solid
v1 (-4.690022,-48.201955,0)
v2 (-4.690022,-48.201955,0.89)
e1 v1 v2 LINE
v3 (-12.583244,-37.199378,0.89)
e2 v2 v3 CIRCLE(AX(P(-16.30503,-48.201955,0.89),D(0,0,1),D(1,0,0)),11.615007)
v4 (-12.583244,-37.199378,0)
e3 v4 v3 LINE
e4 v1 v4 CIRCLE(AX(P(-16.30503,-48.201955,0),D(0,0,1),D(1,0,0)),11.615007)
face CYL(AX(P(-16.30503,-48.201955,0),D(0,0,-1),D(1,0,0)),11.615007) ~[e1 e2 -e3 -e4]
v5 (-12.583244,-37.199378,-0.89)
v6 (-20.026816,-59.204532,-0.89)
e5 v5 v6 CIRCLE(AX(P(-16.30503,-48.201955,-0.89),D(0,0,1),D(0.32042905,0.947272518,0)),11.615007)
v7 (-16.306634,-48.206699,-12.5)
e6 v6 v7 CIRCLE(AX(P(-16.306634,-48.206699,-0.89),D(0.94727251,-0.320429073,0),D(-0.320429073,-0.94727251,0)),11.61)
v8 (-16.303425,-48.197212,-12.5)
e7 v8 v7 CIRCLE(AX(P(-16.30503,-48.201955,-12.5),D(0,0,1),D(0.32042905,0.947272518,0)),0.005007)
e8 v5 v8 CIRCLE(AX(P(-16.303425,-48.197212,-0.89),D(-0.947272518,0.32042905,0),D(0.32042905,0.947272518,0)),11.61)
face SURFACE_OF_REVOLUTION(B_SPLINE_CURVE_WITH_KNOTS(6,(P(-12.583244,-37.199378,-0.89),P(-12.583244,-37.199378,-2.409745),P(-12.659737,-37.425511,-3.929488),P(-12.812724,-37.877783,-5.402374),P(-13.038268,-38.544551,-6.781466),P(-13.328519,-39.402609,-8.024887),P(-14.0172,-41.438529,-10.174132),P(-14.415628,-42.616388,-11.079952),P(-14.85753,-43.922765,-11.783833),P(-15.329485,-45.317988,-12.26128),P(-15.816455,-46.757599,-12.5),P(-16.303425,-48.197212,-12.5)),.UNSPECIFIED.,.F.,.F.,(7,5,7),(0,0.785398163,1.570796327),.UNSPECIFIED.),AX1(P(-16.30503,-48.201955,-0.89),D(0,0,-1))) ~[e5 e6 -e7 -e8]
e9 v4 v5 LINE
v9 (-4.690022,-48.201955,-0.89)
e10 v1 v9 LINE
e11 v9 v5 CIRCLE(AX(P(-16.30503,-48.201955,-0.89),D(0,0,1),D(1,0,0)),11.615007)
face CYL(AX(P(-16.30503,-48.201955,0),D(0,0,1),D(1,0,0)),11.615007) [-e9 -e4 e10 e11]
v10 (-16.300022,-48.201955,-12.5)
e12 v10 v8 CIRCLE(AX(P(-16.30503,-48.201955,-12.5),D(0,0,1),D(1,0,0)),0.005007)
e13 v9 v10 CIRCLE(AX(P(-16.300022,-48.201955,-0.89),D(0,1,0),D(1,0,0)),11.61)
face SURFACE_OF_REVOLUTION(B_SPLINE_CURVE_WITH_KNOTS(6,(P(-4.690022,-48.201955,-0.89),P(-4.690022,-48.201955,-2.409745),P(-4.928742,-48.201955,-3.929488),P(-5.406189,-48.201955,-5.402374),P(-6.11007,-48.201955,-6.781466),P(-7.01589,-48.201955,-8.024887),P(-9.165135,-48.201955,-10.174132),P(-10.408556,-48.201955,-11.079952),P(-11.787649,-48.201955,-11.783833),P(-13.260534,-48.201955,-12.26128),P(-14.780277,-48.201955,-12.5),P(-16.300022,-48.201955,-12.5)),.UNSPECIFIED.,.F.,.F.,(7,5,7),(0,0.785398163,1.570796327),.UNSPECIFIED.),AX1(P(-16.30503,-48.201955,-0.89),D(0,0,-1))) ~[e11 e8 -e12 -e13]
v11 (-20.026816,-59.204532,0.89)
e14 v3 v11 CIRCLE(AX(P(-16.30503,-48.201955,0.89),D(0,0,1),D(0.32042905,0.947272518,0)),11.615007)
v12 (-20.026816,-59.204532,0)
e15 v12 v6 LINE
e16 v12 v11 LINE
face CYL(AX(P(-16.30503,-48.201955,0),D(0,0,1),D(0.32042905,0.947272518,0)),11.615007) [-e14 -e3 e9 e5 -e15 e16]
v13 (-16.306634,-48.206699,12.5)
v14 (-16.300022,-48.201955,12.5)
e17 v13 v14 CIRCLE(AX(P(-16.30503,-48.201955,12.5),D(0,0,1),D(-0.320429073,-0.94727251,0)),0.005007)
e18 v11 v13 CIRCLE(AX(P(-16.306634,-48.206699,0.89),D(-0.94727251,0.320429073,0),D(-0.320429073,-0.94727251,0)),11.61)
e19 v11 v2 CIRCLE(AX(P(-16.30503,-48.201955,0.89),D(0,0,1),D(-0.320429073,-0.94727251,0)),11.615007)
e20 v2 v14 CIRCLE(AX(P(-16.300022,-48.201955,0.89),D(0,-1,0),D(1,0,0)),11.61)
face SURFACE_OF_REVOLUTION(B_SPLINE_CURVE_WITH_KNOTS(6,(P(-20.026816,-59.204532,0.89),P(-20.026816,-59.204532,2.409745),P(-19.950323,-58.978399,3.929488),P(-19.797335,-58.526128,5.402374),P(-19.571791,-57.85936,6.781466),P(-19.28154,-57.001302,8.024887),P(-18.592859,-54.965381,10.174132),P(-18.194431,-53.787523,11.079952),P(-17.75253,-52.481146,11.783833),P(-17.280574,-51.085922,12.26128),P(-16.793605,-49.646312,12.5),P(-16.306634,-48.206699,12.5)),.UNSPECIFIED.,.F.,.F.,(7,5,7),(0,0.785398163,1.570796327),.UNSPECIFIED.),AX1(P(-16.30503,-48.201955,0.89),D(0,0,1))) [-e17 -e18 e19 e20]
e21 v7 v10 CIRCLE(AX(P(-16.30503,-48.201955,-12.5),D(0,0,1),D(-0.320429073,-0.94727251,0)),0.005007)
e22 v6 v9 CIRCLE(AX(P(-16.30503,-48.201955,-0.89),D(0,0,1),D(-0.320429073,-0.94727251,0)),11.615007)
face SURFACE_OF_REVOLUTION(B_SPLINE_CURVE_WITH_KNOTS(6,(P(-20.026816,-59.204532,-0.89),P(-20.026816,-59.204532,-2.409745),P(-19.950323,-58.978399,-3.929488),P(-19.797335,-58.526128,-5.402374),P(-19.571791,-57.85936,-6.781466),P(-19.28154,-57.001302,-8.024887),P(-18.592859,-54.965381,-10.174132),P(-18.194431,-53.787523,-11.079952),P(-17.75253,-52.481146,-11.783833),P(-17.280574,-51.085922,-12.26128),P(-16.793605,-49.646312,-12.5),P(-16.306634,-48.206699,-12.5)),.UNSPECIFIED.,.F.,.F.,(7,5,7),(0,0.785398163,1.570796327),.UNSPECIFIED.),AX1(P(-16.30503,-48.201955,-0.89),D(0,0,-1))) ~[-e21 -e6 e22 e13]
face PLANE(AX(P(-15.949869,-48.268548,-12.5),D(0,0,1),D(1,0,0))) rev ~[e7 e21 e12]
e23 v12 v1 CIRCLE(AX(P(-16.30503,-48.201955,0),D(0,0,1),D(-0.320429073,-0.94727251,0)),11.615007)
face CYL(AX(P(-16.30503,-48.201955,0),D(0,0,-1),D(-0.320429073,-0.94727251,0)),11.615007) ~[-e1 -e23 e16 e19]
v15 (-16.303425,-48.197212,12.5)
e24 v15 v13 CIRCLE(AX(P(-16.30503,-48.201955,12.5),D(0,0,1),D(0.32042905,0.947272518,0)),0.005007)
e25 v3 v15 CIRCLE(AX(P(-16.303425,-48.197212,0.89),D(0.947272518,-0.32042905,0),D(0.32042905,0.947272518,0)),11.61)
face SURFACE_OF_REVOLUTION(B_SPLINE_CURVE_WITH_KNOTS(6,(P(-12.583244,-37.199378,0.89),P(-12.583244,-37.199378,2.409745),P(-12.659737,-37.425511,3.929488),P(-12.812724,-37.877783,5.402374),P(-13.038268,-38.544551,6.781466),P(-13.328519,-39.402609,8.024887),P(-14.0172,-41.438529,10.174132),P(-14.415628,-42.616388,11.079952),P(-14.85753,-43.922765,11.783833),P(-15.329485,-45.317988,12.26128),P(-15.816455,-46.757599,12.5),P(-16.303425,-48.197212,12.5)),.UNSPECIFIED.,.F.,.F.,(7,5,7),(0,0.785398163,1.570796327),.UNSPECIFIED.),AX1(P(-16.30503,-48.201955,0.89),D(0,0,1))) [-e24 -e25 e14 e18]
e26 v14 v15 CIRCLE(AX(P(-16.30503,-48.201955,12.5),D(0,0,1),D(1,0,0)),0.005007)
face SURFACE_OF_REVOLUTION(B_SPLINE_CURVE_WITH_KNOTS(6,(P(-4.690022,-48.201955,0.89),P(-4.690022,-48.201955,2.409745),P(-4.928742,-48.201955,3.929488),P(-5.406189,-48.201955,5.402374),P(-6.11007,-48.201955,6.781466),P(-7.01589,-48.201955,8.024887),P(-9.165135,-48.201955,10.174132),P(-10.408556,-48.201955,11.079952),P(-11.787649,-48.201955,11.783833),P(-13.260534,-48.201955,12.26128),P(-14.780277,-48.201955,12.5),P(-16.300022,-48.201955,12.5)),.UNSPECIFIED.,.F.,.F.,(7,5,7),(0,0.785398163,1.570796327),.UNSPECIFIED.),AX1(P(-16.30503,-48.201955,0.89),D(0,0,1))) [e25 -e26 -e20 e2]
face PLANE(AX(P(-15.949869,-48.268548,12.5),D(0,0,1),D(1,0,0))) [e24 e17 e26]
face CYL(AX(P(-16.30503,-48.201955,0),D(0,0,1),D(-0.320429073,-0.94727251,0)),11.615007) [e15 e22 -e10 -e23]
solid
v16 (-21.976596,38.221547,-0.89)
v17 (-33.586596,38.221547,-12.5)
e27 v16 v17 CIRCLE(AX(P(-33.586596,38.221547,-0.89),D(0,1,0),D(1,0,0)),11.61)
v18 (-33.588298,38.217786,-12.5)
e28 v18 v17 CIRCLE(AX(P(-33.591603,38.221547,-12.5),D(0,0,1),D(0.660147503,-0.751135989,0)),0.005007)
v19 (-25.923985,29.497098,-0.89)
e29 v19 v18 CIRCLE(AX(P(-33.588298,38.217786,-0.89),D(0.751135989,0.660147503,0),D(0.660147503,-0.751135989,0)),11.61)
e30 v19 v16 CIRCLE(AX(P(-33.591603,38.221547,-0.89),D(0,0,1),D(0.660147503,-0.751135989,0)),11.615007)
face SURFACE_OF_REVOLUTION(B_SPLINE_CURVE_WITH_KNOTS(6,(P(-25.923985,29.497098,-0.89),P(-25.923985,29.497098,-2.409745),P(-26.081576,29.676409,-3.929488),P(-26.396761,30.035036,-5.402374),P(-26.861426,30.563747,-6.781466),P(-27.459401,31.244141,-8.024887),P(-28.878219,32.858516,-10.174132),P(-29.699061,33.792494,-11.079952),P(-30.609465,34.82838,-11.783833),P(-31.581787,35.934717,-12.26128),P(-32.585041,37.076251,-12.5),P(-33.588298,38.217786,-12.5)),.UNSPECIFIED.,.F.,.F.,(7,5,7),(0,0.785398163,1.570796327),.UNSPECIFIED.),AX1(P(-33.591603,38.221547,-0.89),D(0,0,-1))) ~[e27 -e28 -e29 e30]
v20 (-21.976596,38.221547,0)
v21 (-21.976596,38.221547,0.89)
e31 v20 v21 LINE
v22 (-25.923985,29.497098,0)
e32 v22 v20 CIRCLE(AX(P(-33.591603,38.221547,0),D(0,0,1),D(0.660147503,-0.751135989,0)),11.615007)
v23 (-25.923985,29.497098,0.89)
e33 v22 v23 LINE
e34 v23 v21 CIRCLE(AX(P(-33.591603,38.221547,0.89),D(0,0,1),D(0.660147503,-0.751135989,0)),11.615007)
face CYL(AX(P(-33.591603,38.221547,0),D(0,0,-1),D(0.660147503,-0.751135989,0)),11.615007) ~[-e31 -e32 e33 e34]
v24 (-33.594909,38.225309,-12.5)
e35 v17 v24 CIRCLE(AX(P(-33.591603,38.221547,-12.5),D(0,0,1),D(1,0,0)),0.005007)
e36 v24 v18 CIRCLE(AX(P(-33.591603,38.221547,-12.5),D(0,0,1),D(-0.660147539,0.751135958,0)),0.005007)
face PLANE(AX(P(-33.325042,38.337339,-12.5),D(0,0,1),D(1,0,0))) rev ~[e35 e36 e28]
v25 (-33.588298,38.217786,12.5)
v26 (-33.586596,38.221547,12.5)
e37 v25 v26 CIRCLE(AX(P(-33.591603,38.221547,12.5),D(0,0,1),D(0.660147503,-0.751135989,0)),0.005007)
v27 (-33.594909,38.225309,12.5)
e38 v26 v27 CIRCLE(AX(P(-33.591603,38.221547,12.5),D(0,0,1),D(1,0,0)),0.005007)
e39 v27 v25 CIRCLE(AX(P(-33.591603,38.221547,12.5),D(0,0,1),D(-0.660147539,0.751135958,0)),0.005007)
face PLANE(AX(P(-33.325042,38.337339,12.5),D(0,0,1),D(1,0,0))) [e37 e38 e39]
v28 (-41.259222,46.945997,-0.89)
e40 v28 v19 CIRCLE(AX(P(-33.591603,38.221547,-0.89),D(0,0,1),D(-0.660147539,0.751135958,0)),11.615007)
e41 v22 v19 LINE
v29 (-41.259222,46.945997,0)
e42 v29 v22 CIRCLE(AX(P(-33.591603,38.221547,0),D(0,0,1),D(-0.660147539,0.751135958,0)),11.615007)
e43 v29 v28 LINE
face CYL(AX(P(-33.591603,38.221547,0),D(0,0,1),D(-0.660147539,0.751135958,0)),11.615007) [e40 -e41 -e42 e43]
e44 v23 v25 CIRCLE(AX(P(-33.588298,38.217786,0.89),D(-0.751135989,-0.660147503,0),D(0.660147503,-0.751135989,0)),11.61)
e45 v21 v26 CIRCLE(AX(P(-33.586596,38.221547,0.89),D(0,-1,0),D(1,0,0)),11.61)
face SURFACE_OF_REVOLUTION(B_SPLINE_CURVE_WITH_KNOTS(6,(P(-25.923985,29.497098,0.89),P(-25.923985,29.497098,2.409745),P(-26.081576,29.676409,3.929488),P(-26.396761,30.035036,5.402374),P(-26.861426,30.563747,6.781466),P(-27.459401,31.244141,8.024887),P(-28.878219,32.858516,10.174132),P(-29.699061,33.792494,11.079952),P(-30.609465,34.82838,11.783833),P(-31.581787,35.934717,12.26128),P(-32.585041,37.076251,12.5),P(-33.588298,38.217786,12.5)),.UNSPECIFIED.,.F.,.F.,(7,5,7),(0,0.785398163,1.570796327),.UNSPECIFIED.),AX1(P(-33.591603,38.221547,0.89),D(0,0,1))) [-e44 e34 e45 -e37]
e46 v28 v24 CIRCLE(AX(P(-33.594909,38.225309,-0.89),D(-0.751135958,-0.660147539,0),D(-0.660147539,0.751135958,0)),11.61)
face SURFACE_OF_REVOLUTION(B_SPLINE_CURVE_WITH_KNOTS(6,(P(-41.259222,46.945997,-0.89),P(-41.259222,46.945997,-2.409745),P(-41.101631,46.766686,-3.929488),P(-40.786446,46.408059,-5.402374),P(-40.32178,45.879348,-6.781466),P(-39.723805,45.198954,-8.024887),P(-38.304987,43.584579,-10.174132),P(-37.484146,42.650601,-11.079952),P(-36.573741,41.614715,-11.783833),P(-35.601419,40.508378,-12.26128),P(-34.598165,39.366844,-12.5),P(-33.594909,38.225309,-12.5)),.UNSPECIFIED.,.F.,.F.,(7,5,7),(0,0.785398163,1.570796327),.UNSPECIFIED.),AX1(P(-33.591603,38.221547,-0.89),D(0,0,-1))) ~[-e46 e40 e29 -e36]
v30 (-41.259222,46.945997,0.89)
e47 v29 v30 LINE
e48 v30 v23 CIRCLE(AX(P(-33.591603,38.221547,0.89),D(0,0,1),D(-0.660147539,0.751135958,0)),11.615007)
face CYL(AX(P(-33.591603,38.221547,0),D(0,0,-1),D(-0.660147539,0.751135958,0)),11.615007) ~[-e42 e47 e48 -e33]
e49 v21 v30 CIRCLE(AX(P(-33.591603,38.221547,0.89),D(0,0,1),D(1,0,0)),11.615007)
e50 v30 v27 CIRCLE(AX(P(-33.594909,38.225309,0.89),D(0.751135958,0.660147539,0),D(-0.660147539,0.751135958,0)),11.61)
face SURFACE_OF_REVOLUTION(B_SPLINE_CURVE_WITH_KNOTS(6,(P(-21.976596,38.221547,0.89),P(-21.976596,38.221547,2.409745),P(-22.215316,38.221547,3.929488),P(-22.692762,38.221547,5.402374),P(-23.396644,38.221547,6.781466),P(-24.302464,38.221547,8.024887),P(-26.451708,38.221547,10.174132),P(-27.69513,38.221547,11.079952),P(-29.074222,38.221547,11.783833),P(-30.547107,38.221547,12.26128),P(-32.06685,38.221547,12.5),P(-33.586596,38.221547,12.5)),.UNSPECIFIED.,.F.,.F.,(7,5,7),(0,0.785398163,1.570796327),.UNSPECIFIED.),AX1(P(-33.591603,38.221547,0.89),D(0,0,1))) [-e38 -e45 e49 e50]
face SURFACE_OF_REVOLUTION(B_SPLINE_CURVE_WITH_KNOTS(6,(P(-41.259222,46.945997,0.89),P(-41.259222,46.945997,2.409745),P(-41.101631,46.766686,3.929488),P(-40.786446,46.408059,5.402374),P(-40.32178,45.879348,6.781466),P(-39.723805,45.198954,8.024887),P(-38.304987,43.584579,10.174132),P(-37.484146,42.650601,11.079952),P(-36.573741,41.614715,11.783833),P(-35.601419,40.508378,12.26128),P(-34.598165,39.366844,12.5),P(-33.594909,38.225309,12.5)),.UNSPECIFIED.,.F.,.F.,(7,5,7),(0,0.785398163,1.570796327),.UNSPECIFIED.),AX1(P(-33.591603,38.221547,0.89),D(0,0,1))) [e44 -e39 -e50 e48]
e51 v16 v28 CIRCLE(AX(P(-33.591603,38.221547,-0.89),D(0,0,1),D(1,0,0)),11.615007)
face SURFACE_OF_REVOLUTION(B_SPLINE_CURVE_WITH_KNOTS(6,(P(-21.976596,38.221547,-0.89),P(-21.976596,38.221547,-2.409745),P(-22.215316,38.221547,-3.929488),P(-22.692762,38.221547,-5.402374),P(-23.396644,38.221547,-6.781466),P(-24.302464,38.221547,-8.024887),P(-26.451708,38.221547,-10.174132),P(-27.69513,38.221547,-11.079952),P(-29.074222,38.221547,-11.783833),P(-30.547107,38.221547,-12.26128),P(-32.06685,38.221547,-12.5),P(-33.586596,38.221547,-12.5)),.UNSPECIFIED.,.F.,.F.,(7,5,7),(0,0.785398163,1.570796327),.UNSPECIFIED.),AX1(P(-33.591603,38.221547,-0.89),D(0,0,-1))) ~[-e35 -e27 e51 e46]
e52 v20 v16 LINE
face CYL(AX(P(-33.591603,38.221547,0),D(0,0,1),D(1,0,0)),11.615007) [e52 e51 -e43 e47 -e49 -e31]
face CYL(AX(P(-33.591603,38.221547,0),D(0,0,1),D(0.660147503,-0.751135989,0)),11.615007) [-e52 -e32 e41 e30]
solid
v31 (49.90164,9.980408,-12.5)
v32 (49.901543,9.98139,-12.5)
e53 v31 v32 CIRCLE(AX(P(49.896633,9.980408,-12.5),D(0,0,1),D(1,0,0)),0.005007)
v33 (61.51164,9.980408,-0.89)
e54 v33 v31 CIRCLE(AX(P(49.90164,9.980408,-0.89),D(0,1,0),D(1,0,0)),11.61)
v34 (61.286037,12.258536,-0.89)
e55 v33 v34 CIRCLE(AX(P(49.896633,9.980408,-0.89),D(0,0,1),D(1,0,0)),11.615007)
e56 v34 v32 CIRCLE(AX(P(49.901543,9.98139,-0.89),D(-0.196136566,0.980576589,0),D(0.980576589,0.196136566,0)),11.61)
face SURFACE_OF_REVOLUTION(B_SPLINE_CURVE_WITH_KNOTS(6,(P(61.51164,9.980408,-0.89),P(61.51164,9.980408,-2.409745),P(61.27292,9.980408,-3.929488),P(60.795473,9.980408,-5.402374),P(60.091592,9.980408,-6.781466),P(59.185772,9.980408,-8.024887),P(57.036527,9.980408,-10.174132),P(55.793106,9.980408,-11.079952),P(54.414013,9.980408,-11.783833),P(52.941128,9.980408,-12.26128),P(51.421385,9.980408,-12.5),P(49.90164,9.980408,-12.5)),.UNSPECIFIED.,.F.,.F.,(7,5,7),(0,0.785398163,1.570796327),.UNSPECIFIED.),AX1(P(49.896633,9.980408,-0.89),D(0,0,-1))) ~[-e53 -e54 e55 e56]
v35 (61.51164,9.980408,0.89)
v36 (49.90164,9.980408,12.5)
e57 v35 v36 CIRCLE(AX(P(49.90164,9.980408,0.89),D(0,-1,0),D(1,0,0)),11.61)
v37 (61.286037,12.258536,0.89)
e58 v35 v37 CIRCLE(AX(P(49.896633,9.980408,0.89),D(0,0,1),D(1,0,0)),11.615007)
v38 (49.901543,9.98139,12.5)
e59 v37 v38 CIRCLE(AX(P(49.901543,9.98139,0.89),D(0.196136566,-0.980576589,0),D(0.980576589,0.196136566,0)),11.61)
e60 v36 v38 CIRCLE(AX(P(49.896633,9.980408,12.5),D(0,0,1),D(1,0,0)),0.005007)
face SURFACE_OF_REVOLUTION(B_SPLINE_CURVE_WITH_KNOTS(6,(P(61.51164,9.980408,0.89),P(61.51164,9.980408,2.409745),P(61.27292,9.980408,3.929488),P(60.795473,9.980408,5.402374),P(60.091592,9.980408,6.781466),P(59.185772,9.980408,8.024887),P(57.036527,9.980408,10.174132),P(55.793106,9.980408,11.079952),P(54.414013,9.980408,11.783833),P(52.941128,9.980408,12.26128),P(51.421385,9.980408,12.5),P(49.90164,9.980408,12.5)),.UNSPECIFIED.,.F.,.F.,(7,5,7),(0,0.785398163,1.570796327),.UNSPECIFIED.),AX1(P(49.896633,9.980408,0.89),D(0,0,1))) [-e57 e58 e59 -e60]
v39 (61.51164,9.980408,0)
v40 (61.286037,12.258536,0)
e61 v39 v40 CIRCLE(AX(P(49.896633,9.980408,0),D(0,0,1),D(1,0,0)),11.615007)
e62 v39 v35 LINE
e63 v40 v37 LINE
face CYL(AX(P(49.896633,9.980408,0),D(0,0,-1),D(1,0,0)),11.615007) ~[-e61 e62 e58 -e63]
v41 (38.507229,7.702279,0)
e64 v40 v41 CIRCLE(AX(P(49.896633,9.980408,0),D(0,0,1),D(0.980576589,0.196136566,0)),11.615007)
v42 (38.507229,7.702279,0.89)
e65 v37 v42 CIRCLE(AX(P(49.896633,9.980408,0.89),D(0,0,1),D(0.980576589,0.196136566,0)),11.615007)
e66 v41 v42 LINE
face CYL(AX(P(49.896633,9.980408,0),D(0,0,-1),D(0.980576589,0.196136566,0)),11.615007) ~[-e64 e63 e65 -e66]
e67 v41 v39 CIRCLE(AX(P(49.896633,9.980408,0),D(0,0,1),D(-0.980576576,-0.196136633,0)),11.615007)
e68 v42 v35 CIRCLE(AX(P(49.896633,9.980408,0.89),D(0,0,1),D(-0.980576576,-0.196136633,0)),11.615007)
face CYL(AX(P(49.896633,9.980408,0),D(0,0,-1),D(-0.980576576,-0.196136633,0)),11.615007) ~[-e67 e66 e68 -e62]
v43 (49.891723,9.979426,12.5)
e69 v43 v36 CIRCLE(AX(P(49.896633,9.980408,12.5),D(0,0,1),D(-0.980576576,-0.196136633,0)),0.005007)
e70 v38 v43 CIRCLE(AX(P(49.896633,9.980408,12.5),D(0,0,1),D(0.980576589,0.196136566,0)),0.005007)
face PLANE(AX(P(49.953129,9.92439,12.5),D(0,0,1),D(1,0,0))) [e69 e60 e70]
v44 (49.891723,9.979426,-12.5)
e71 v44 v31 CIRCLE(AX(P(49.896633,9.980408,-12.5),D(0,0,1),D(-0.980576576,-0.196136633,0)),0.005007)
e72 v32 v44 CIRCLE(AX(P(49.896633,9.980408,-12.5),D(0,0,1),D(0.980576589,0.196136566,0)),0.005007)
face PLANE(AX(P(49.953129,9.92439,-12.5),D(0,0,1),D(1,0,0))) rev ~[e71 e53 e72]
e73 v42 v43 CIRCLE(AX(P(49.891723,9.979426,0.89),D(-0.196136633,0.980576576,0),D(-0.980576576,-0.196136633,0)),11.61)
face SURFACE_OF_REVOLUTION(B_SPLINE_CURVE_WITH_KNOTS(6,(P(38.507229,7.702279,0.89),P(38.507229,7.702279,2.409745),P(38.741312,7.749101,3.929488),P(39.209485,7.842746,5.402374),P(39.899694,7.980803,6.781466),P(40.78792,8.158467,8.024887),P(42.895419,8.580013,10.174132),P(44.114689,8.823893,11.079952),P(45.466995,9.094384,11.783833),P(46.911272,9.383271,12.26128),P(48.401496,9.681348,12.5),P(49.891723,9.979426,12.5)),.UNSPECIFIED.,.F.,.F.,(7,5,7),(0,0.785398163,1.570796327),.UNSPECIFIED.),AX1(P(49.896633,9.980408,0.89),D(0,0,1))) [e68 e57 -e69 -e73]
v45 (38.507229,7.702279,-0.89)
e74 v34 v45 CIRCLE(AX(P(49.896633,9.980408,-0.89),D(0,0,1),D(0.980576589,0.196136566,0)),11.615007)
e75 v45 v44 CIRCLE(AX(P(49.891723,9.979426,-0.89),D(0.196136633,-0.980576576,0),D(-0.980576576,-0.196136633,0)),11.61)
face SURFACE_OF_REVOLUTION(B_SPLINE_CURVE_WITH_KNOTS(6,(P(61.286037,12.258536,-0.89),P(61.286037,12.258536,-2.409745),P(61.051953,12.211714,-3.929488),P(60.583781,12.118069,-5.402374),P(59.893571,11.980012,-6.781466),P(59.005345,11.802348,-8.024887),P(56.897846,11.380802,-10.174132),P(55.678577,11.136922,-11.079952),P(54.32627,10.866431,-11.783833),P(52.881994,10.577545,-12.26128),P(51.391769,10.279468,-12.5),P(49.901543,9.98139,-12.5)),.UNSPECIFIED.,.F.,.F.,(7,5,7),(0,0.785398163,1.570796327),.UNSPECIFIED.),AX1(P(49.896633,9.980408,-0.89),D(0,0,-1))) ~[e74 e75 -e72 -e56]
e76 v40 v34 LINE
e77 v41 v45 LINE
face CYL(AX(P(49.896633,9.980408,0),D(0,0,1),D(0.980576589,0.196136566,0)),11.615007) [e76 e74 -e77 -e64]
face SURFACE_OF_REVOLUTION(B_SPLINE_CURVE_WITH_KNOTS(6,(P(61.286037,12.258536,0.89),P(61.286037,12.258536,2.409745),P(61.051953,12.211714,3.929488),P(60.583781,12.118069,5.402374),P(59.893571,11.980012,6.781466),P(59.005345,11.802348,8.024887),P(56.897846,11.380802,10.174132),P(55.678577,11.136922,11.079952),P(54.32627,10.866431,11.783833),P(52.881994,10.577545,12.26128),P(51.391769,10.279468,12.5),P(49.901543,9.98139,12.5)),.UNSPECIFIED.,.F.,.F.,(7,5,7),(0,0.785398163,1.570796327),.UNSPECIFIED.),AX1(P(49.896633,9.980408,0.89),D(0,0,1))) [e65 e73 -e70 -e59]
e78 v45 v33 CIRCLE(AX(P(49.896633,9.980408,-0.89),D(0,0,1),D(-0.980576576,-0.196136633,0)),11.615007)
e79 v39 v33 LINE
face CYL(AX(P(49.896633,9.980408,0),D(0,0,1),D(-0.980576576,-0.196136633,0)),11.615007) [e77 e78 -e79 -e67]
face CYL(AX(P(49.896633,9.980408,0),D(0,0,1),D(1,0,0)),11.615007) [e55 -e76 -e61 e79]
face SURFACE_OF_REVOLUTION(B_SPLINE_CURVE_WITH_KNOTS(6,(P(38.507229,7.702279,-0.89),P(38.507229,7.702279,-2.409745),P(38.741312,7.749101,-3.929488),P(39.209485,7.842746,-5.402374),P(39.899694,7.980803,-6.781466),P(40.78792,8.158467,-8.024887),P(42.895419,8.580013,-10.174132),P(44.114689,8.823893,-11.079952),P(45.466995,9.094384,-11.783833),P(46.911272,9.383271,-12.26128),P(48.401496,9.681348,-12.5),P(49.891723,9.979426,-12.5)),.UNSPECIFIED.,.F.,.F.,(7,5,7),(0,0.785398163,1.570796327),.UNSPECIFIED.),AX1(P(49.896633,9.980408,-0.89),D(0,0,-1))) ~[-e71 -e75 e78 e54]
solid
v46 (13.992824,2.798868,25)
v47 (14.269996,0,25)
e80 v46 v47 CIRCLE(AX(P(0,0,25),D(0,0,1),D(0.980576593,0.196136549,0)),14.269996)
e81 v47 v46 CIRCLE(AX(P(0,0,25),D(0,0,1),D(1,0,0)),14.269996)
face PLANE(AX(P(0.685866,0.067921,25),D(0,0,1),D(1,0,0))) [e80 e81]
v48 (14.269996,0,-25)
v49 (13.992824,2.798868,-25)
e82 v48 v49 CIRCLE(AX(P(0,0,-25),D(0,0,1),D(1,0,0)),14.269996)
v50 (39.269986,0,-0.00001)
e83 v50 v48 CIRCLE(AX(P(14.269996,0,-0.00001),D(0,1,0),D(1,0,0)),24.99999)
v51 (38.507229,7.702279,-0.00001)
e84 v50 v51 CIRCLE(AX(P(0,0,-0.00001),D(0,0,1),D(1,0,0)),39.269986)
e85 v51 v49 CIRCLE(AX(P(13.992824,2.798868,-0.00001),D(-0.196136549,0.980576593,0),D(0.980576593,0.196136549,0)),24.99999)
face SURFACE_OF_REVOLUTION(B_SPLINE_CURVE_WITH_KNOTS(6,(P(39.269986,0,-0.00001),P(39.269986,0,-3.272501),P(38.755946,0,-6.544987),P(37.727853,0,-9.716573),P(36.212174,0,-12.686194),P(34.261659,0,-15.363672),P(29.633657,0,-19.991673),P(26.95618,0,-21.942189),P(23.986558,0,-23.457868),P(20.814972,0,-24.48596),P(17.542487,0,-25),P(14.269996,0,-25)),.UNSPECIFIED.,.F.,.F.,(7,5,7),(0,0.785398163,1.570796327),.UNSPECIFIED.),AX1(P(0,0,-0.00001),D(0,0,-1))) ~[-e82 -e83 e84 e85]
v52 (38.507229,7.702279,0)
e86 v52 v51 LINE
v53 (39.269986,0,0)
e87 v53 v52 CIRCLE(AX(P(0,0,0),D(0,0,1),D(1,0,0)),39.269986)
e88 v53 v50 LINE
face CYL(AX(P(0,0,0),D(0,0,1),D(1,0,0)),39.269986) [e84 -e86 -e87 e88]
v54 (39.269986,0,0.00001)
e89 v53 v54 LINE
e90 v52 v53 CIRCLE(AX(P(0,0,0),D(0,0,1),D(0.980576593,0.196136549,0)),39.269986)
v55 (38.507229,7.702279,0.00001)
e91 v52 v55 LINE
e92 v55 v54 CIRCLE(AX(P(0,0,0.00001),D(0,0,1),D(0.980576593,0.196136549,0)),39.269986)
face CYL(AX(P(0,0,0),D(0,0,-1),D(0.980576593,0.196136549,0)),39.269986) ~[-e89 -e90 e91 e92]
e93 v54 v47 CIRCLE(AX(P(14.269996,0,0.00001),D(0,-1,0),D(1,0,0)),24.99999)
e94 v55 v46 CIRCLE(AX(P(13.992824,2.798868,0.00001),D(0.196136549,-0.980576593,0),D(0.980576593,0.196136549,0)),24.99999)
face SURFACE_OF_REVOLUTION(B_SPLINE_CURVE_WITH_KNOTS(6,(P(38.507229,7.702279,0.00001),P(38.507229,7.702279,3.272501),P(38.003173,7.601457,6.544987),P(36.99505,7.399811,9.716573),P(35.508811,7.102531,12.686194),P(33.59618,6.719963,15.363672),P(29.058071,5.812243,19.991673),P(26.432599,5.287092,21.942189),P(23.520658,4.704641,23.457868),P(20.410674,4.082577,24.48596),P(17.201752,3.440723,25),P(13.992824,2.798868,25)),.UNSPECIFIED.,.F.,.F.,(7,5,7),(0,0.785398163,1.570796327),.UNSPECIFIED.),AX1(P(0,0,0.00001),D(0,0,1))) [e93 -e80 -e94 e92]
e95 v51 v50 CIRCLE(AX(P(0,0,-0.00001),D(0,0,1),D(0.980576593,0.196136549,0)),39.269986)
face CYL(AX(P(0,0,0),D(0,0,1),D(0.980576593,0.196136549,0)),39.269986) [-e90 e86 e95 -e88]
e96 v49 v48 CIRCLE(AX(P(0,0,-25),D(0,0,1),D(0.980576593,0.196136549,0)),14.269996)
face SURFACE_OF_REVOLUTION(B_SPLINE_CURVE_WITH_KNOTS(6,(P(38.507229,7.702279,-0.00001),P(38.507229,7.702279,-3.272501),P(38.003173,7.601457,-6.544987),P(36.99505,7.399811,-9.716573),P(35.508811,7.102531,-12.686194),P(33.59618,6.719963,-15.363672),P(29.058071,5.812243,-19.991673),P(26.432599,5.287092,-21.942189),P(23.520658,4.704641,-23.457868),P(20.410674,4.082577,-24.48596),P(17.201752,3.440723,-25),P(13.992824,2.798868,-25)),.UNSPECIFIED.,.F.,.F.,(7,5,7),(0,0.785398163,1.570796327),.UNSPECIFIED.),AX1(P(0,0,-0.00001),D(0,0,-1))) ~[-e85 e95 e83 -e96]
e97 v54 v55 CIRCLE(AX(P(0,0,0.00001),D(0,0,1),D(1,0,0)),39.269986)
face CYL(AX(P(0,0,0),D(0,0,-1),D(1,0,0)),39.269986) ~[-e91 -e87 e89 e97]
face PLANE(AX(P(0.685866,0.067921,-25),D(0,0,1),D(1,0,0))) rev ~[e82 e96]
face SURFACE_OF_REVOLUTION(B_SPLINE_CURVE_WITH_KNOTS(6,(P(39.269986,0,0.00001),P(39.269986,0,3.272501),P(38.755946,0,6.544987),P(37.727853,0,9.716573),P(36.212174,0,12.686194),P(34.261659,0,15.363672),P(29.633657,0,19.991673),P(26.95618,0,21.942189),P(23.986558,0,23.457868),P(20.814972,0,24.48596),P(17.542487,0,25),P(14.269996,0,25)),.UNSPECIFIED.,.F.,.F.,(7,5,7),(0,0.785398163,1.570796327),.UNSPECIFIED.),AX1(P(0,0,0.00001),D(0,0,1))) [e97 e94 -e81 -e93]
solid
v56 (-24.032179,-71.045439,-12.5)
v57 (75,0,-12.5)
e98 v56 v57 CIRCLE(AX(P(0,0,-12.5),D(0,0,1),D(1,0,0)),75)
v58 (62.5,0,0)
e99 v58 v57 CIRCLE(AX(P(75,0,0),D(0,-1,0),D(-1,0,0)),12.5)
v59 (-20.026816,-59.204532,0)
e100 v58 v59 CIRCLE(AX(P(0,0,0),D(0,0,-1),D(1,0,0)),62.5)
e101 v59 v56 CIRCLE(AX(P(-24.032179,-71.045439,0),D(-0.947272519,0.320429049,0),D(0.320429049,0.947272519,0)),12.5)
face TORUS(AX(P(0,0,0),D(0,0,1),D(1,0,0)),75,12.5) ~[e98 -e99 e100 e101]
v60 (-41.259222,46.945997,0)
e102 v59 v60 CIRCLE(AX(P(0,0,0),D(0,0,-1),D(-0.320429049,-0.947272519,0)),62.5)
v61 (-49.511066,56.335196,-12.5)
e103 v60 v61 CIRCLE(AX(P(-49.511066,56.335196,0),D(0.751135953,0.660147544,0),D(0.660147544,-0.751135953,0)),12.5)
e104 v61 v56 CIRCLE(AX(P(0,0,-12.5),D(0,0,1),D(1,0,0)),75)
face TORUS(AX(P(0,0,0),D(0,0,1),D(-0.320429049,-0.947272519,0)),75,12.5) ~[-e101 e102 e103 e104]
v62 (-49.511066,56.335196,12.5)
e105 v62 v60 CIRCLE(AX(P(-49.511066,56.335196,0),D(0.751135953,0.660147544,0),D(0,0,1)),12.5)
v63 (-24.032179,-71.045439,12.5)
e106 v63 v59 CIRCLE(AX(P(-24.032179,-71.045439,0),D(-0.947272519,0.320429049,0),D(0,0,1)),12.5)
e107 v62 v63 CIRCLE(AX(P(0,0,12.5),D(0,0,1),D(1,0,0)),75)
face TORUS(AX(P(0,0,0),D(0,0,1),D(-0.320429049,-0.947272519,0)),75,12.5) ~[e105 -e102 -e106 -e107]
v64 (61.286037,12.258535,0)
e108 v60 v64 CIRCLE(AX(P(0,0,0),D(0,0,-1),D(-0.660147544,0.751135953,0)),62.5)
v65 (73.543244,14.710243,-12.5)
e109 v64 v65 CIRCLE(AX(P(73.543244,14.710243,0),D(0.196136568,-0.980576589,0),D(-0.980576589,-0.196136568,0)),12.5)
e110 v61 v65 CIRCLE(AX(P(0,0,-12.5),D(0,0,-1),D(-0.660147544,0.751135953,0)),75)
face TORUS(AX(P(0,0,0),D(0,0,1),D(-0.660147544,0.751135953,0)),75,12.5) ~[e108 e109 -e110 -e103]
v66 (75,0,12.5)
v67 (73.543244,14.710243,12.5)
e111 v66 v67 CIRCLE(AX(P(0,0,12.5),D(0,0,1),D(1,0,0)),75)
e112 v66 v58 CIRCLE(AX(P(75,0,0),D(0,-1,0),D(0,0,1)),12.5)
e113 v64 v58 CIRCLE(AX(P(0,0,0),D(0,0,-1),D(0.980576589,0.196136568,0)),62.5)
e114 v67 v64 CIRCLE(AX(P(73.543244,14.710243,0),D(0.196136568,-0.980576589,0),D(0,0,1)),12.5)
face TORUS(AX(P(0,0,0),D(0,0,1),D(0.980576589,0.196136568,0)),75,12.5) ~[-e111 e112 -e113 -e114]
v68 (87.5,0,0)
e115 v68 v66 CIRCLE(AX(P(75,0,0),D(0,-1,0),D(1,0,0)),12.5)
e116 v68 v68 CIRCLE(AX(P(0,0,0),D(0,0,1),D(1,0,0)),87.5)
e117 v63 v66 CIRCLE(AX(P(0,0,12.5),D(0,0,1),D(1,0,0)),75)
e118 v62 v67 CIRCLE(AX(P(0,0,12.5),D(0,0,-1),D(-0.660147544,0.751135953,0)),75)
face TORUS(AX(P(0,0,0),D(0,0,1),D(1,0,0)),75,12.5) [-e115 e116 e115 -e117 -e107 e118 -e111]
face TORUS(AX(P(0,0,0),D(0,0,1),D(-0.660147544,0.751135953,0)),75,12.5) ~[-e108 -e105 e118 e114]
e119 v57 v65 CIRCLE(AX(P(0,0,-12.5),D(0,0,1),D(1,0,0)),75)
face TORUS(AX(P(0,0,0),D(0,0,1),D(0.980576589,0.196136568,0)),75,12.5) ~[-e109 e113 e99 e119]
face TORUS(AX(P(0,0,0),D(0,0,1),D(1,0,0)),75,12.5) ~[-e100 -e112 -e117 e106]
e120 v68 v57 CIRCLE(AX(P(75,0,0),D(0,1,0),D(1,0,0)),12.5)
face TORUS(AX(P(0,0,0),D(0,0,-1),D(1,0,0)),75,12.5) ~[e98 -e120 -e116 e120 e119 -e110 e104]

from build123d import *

# Parameters (mm, degrees)
F0_R         = 87.5
F1_DEPTH     = 12.5
F2_T4_ANGLE  = 119.9999999366
F2_T6_ANGLE  = 11.3111263795
F2_T8_ANGLE  = 108.6888739249
F2_T10_ANGLE = 119.999999759
F2_T14_ANGLE = 119.9999999366
F2_T16_ANGLE = 11.3111263795
F2_T18_ANGLE = 108.6888739249
F2_T20_ANGLE = 119.999999759
F3_DEPTH     = 12.5
F4_R         = 11.61
F4_2_R       = 11.61
F4_3_R       = 11.61
F5_DEPTH     = 25
F6_R         = 24.99999


# Not quite as in the source:
# - a fillet or chamfer that OpenCascade refuses, or shapes differently, is made with other operations: its cross-section is extruded or revolved along the edge and cut away or added
# - a fillet or chamfer is up to 0.001 mm smaller than in the source, because OpenCascade refuses the exact size


with BuildPart() as f1:
    # F0 (on Top) → F1 (new body, symmetric)
    with BuildSketch(Plane.XY):
        Circle(F0_R)
        with BuildLine():
            ThreePointArc((61.2860368058, 12.2585355016), (62.1957687482, 6.1592491279), (62.5, 0))
            ThreePointArc((62.5, 0), (36.4319504522, -50.7834912766), (-20.0268155599, -59.2045324154))
            ThreePointArc((-20.0268155599, -59.2045324154), (-61.2860368451, -12.2585353049), (-41.2592215085, 46.9459970659))
            ThreePointArc((-41.2592215085, 46.9459970659), (20.0268152781, 59.2045325108), (61.2860368058, 12.2585355016))
        make_face(mode=Mode.SUBTRACT)
    extrude(amount=F1_DEPTH, both=True)

    # F2: fillet of radius 12.5 on 10 edges, made by hand

    # F2_s1 → F2_t2 (revolve, cut)
    with BuildSketch(Plane.XZ):
        with BuildLine():
            ThreePointArc((87.5, 0), (83.8388347648, 8.8388347648), (75, 12.5))
            Line((75, 12.5), (87.5, 12.5))
            Line((87.5, 12.5), (87.5, 0))
        make_face()
    revolve(axis=Axis((0, 0, 12.5), (0, 0, 1)), mode=Mode.SUBTRACT)

    # F2_s3 → F2_t4 (revolve, cut)
    with BuildSketch(Plane(origin=(0, 0, 0), x_dir=(0, 0, 1), z_dir=(-0.7511359531, -0.6601475441, 0))):
        with BuildLine():
            ThreePointArc((12.5, 75), (8.8388347648, 66.1611652352), (0, 62.5))
            Line((0, 62.5), (12.5, 62.5))
            Line((12.5, 62.5), (12.5, 75))
        make_face()
    revolve(axis=Axis((0, 0, 12.5), (0, 0, -1)), revolution_arc=F2_T4_ANGLE, mode=Mode.SUBTRACT)

    # F2_s5 → F2_t6 (revolve, cut)
    with BuildSketch(Plane(origin=(0, 0, 0), x_dir=(0, 0, 1), z_dir=(-0.196136568, 0.9805765889, 0))):
        with BuildLine():
            ThreePointArc((12.5, 75), (8.8388347648, 66.1611652352), (0, 62.5))
            Line((0, 62.5), (12.5, 62.5))
            Line((12.5, 62.5), (12.5, 75))
        make_face()
    revolve(axis=Axis((0, 0, 12.5), (0, 0, -1)), revolution_arc=F2_T6_ANGLE, mode=Mode.SUBTRACT)

    # F2_s7 → F2_t8 (revolve, cut)
    with BuildSketch(Plane.XZ):
        with BuildLine():
            ThreePointArc((75, 12.5), (66.1611652352, 8.8388347648), (62.5, 0))
            Line((62.5, 0), (62.5, 12.5))
            Line((62.5, 12.5), (75, 12.5))
        make_face()
    revolve(axis=Axis((0, 0, 12.5), (0, 0, -1)), revolution_arc=F2_T8_ANGLE, mode=Mode.SUBTRACT)

    # F2_s9 → F2_t10 (revolve, cut)
    with BuildSketch(Plane(origin=(0, 0, 0), x_dir=(0, 0, 1), z_dir=(0.9472725186, -0.320429049, 0))):
        with BuildLine():
            ThreePointArc((12.5, 75), (8.8388347648, 66.1611652352), (0, 62.5))
            Line((0, 62.5), (12.5, 62.5))
            Line((12.5, 62.5), (12.5, 75))
        make_face()
    revolve(axis=Axis((0, 0, 12.5), (0, 0, -1)), revolution_arc=F2_T10_ANGLE, mode=Mode.SUBTRACT)

    # F2_s11 → F2_t12 (revolve, cut)
    with BuildSketch(Plane.XZ):
        with BuildLine():
            ThreePointArc((87.5, 0), (83.8388347648, -8.8388347648), (75, -12.5))
            Line((75, -12.5), (87.5, -12.5))
            Line((87.5, -12.5), (87.5, 0))
        make_face()
    revolve(axis=Axis((0, 0, -12.5), (0, 0, 1)), mode=Mode.SUBTRACT)

    # F2_s13 → F2_t14 (revolve, cut)
    with BuildSketch(Plane(origin=(0, 0, 0), x_dir=(0, 0, 1), z_dir=(-0.7511359531, -0.6601475441, 0))):
        with BuildLine():
            ThreePointArc((0, 62.5), (-8.8388347648, 66.1611652352), (-12.5, 75))
            Line((-12.5, 75), (-12.5, 62.5))
            Line((-12.5, 62.5), (0, 62.5))
        make_face()
    revolve(axis=Axis((0, 0, -12.5), (0, 0, -1)), revolution_arc=F2_T14_ANGLE, mode=Mode.SUBTRACT)

    # F2_s15 → F2_t16 (revolve, cut)
    with BuildSketch(Plane(origin=(0, 0, 0), x_dir=(0, 0, 1), z_dir=(-0.196136568, 0.9805765889, 0))):
        with BuildLine():
            ThreePointArc((0, 62.5), (-8.8388347648, 66.1611652352), (-12.5, 75))
            Line((-12.5, 75), (-12.5, 62.5))
            Line((-12.5, 62.5), (0, 62.5))
        make_face()
    revolve(axis=Axis((0, 0, -12.5), (0, 0, -1)), revolution_arc=F2_T16_ANGLE, mode=Mode.SUBTRACT)

    # F2_s17 → F2_t18 (revolve, cut)
    with BuildSketch(Plane.XZ):
        with BuildLine():
            ThreePointArc((62.5, 0), (66.1611652352, -8.8388347648), (75, -12.5))
            Line((75, -12.5), (62.5, -12.5))
            Line((62.5, -12.5), (62.5, 0))
        make_face()
    revolve(axis=Axis((0, 0, -12.5), (0, 0, -1)), revolution_arc=F2_T18_ANGLE, mode=Mode.SUBTRACT)

    # F2_s19 → F2_t20 (revolve, cut)
    with BuildSketch(Plane(origin=(0, 0, 0), x_dir=(0, 0, 1), z_dir=(0.9472725186, -0.320429049, 0))):
        with BuildLine():
            ThreePointArc((0, 62.5), (-8.8388347648, 66.1611652352), (-12.5, 75))
            Line((-12.5, 75), (-12.5, 62.5))
            Line((-12.5, 62.5), (0, 62.5))
        make_face()
    revolve(axis=Axis((0, 0, -12.5), (0, 0, -1)), revolution_arc=F2_T20_ANGLE, mode=Mode.SUBTRACT)


with BuildPart() as f3:
    # F0 (on Top) → F3 (new body, symmetric)
    with BuildSketch(Plane.XY):
        with BuildLine():
            ThreePointArc((-21.9765958464, 38.221547489), (-28.8036520844, 48.8037929128), (-41.2592215085, 46.9459970659))
            ThreePointArc((-41.2592215085, 46.9459970659), (-42.3160528339, 30.5539292627), (-25.923985056, 29.4970975451))
            ThreePointArc((-25.923985056, 29.4970975451), (-23.0093577642, 33.4335962467), (-21.9765958464, 38.221547489))
        make_face()
    extrude(amount=F3_DEPTH, both=True)

    # F4
    f4_edges = [f3.edges().sort_by_distance(p)[0] for p in [
        (-28.803652, 48.803793, 12.5),
        (-42.316053, 30.553929, 12.5),
        (-23.009358, 33.433596, 12.5),
        (-28.803652, 48.803793, -12.5),
        (-42.316053, 30.553929, -12.5),
        (-23.009358, 33.433596, -12.5),
    ]]
    fillet(f4_edges, radius=F4_R)


with BuildPart() as f3b:
    # F0 (on Top) → F3, piece 2 (new body, symmetric)
    with BuildSketch(Plane.XY):
        with BuildLine():
            ThreePointArc((61.5116398612, 9.980407871), (61.4551014915, 11.1250434287), (61.2860368058, 12.2585355016))
            ThreePointArc((61.2860368058, 12.2585355016), (47.618504612, 21.3698119643), (38.5072286192, 7.7022794573))
            ThreePointArc((38.5072286192, 7.7022794573), (51.0412685892, -1.5780609469), (61.5116398612, 9.980407871))
        make_face()
    extrude(amount=F3_DEPTH, both=True)

    # F4#2
    f4_2_edges = [f3b.edges().sort_by_distance(p)[0] for p in [
        (61.455101, 11.125043, 12.5),
        (47.618505, 21.369812, 12.5),
        (51.041269, -1.578061, 12.5),
        (61.455101, 11.125043, -12.5),
        (47.618505, 21.369812, -12.5),
        (51.041269, -1.578061, -12.5),
    ]]
    fillet(f4_2_edges, radius=F4_2_R)


with BuildPart() as f3c:
    # F0 (on Top) → F3, piece 3 (new body, symmetric)
    with BuildSketch(Plane.XY):
        with BuildLine():
            ThreePointArc((-12.5832438311, -37.1993782133), (-27.3076066617, -44.4801694956), (-20.0268155599, -59.2045324154))
            ThreePointArc((-20.0268155599, -59.2045324154), (-9.5345117958, -57.6395653372), (-4.6900223335, -48.20195536))
            ThreePointArc((-4.6900223335, -48.20195536), (-6.8674196664, -41.4314374795), (-12.5832438311, -37.1993782133))
        make_face()
    extrude(amount=F3_DEPTH, both=True)

    # F4#3
    f4_3_edges = [f3c.edges().sort_by_distance(p)[0] for p in [
        (-6.86742, -41.431437, 12.5),
        (-27.307607, -44.480169, 12.5),
        (-9.534512, -57.639565, 12.5),
        (-6.86742, -41.431437, -12.5),
        (-27.307607, -44.480169, -12.5),
        (-9.534512, -57.639565, -12.5),
    ]]
    fillet(f4_3_edges, radius=F4_3_R)


with BuildPart() as f5:
    # F0 (on Top) → F5 (new body, symmetric)
    with BuildSketch(Plane.XY):
        with BuildLine():
            ThreePointArc((39.2699855458, 0), (39.0788310729, 3.8699776152), (38.5072286192, 7.7022794573))
            ThreePointArc((38.5072286192, 7.7022794573), (12.5832439583, 37.1993781703), (-25.923985056, 29.4970975451))
            ThreePointArc((-25.923985056, 29.4970975451), (-38.5072283966, -7.70228057), (-12.5832438311, -37.1993782133))
            ThreePointArc((-12.5832438311, -37.1993782133), (22.890914807, -31.9082714052), (39.2699855458, 0))
        make_face()
    extrude(amount=F5_DEPTH, both=True)

    # F6 (radius 25 in the source; OpenCascade refuses exactly that, so slightly less here)
    f6_edges = [f5.edges().sort_by_distance(p)[0] for p in [
        (39.078831, 3.869978, 25),
        (12.583244, 37.199378, 25),
        (-38.507228, -7.702281, 25),
        (22.890915, -31.908271, 25),
        (39.078831, 3.869978, -25),
        (12.583244, 37.199378, -25),
        (-38.507228, -7.702281, -25),
        (22.890915, -31.908271, -25),
    ]]
    fillet(f6_edges, radius=F6_R)


solid = Compound([f1.part, f3.part, f3b.part, f3c.part, f5.part])
